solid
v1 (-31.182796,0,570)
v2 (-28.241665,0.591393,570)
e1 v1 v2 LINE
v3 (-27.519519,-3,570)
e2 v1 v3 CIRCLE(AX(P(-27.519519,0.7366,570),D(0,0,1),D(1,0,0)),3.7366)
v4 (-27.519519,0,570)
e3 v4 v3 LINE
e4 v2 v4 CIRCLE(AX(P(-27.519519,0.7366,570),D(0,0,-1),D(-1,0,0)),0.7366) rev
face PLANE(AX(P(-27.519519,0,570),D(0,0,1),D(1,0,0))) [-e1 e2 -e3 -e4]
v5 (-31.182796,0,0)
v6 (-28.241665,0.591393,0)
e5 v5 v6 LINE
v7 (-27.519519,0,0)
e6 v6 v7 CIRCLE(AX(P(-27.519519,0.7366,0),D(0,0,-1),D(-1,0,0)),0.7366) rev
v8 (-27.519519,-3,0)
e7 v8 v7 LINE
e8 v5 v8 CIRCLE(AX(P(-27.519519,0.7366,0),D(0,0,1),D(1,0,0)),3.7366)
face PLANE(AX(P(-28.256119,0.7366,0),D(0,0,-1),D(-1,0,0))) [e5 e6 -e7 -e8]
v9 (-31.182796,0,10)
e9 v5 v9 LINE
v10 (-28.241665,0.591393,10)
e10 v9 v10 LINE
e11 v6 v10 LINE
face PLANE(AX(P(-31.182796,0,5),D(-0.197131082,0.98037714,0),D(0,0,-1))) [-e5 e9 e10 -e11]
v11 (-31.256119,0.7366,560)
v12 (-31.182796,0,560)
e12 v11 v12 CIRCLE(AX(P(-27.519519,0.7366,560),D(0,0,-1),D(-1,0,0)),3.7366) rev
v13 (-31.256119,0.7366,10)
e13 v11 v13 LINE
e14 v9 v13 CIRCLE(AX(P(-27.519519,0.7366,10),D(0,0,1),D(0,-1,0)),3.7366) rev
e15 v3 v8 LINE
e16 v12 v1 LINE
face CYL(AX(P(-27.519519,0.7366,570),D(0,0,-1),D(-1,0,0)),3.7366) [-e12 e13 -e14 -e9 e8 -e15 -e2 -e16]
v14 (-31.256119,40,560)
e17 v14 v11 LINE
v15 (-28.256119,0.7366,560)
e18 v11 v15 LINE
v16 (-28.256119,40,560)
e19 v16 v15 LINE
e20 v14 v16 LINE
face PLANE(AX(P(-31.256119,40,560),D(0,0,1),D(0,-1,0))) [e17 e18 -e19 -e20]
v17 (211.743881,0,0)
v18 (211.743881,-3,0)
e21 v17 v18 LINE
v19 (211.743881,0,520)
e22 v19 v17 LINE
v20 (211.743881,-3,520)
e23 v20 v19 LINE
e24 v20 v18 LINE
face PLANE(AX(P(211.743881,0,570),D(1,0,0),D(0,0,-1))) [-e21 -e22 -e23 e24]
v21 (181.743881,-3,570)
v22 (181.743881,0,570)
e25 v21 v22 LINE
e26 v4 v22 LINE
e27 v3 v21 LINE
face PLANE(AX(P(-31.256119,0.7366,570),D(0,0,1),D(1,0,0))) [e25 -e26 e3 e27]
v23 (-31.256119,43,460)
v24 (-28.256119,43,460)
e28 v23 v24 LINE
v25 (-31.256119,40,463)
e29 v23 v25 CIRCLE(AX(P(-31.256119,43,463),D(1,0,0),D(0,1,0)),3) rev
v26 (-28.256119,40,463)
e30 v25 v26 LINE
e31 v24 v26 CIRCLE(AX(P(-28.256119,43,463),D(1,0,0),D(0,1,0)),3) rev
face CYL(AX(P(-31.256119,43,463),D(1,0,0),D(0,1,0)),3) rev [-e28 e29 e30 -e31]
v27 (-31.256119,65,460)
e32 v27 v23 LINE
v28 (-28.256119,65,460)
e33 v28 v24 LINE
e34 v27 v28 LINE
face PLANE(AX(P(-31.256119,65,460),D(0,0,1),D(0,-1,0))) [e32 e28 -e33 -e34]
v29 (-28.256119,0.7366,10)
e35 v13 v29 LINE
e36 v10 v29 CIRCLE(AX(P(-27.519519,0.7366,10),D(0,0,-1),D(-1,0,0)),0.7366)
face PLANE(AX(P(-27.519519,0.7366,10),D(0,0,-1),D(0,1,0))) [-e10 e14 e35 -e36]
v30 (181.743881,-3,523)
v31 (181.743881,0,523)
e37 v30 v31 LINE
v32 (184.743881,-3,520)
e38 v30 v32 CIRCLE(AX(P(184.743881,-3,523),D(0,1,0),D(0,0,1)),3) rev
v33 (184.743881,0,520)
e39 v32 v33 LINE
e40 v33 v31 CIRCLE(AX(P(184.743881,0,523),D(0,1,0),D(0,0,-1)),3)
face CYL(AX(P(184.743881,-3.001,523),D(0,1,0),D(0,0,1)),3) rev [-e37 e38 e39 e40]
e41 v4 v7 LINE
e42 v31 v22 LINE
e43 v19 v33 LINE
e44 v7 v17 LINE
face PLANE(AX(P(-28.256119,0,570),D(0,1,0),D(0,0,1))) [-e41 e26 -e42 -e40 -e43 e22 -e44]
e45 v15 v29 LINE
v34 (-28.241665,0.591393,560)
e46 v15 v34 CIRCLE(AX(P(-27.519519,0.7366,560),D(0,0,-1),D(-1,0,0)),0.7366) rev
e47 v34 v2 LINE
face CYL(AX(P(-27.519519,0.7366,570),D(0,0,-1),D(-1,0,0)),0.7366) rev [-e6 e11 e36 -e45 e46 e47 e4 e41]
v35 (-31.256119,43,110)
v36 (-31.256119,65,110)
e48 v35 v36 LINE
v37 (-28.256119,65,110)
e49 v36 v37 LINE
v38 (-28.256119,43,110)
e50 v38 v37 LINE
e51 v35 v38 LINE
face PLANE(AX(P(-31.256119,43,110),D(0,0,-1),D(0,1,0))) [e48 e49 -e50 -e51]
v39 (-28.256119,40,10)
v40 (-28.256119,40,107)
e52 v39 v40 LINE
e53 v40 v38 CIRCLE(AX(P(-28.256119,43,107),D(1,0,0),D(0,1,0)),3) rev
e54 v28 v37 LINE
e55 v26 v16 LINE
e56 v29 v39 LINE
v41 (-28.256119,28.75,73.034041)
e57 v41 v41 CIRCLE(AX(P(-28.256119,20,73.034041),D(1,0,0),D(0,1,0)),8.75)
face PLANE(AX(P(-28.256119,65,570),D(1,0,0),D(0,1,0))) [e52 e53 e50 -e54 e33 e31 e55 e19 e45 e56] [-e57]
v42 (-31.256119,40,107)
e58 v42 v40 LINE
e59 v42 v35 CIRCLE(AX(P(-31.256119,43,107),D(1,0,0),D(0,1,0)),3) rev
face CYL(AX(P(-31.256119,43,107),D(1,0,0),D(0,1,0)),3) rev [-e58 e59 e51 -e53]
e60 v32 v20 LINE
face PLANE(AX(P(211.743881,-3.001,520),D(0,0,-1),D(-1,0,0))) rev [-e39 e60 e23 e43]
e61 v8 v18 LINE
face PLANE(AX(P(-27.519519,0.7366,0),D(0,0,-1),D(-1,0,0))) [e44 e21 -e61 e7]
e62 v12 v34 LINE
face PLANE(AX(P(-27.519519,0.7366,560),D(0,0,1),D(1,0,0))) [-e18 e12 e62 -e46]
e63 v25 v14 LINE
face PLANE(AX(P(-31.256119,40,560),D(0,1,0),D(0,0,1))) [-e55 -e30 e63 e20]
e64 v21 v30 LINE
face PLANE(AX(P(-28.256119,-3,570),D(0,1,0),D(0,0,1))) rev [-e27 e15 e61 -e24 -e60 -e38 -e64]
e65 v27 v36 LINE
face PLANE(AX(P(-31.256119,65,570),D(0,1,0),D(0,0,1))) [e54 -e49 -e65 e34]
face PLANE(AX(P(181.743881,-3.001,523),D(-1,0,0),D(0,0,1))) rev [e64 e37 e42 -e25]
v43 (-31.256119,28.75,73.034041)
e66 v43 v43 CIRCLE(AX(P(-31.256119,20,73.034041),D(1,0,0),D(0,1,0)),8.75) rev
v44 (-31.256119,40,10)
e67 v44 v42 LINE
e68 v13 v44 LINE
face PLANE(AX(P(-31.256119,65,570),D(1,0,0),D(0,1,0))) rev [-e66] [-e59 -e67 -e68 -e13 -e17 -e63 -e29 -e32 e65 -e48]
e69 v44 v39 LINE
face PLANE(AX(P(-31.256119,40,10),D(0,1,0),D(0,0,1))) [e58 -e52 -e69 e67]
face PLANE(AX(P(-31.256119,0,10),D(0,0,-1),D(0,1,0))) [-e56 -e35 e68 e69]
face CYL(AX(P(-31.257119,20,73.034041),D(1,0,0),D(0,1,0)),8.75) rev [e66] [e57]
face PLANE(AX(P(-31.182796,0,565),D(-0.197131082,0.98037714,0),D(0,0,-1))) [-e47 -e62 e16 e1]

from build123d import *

# Parameters (mm, degrees)
BASE_FLANGE1_DEPTH       = 570
CUT_EXTRUDE1_OUTLINE_W   = 3
CUT_EXTRUDE1_OUTLINE_H   = 25
CUT_EXTRUDE1_DEPTH       = 107
CUT_EXTRUDE1_START       = 463
CUT_EXTRUDE1_2_OUTLINE_W = 3
CUT_EXTRUDE1_2_OUTLINE_H = 25
CUT_EXTRUDE1_2_DEPTH     = 107
CUT_EXTRUDE1_START_2     = -32
CUT_EXTRUDE1_3_DEPTH     = 5
CUT_EXTRUDE1_START_3     = -1
CUT_EXTRUDE1_4_DEPTH     = 11
CUT_EXTRUDE1_START_4     = 560
CUT_EXTRUDE1_5_DEPTH     = 11
CUT_EXTRUDE3_REACH       = 613.523
CUT_EXTRUDE4_REACH       = 623.872
SKETCH8_R                = 8.75


with BuildPart() as part:
    # Base-Flange1: sheet metal written as solids
    # Sketch1 → Base-Flange1 (new body)
    with BuildSketch(Plane.XY):
        with BuildLine():
            Line((-28.256118786, 65), (-28.256118786, 0.7366))
            ThreePointArc((-28.256118786, 0.7366), (-28.040373641, 0.215745145), (-27.519518786, 0))
            Line((-27.519518786, 0), (211.743881214, 0))
            Line((211.743881214, 0), (211.743881214, -3))
            Line((211.743881214, -3), (-27.519518786, -3))
            ThreePointArc((-27.519518786, -3), (-30.161693985, -1.905575199), (-31.256118786, 0.7366))
            Line((-31.256118786, 0.7366), (-31.256118786, 65))
            Line((-31.256118786, 65), (-28.256118786, 65))
        make_face()
    extrude(amount=BASE_FLANGE1_DEPTH)

    # Cut-Extrude1: read off the stored shape, not the designer's step
    # Cut-Extrude1 outline → Cut-Extrude1 (cut)
    with BuildSketch(Plane.XY):
        with Locations((-29.756118786, 52.5)):
            Rectangle(CUT_EXTRUDE1_OUTLINE_W, CUT_EXTRUDE1_OUTLINE_H)
    extrude(amount=CUT_EXTRUDE1_DEPTH, mode=Mode.SUBTRACT)

    # Cut-Extrude1 2 outline → Cut-Extrude1 2 (cut)
    with BuildSketch(Plane.XY.offset(CUT_EXTRUDE1_START)):
        with Locations((-29.756118786, 52.5)):
            Rectangle(CUT_EXTRUDE1_2_OUTLINE_W, CUT_EXTRUDE1_2_OUTLINE_H)
    extrude(amount=CUT_EXTRUDE1_2_DEPTH, mode=Mode.SUBTRACT)

    # Cut-Extrude1 3 outline → Cut-Extrude1 3 (cut)
    with BuildSketch(Plane.YZ.offset(CUT_EXTRUDE1_START_2)):
        with BuildLine():
            Line((65, 110), (43, 110))
            ThreePointArc((43, 110), (40.878679656, 109.121320344), (40, 107))
            Line((40, 107), (65, 107))
            Line((65, 107), (65, 110))
        make_face()
        with BuildLine():
            Line((43, 460), (65, 460))
            Line((65, 460), (65, 463))
            Line((65, 463), (40, 463))
            ThreePointArc((40, 463), (40.878679656, 460.878679656), (43, 460))
        make_face()
    extrude(amount=CUT_EXTRUDE1_3_DEPTH, mode=Mode.SUBTRACT)

    # Cut-Extrude1 4 outline → Cut-Extrude1 4 (cut)
    with BuildSketch(Plane.XY.offset(CUT_EXTRUDE1_START_3)):
        with BuildLine():
            Line((-31.182796008, 0), (-28.241664587, 0.591393245))
            ThreePointArc((-28.241664587, 0.591393245), (-28.252496329, 0.663637809), (-28.256118786, 0.7366))
            Line((-28.256118786, 0.7366), (-28.256118786, 40))
            Line((-28.256118786, 40), (-31.256118786, 40))
            Line((-31.256118786, 40), (-31.256118786, 0.7366))
            ThreePointArc((-31.256118786, 0.7366), (-31.237742907, 0.36647982), (-31.182796008, 0))
        make_face()
    extrude(amount=CUT_EXTRUDE1_4_DEPTH, mode=Mode.SUBTRACT)

    # Cut-Extrude1 5 outline → Cut-Extrude1 5 (cut)
    with BuildSketch(Plane.XY.offset(CUT_EXTRUDE1_START_4)):
        with BuildLine():
            Line((-31.182796008, 0), (-28.241664587, 0.591393245))
            ThreePointArc((-28.241664587, 0.591393245), (-28.252496329, 0.663637809), (-28.256118786, 0.7366))
            Line((-28.256118786, 0.7366), (-28.256118786, 40))
            Line((-28.256118786, 40), (-31.256118786, 40))
            Line((-31.256118786, 40), (-31.256118786, 0.7366))
            ThreePointArc((-31.256118786, 0.7366), (-31.237742907, 0.36647982), (-31.182796008, 0))
        make_face()
    extrude(amount=CUT_EXTRUDE1_5_DEPTH, mode=Mode.SUBTRACT)

    # Sketch7 → Cut-Extrude3 (cut, up to next)
    with BuildSketch(Plane(origin=(0, 0, 0), x_dir=(1, 0, 0), z_dir=(0, 1, 0)), mode=Mode.PRIVATE) as cut_extrude3_sk1:
        with BuildLine():
            Line((211.743881214, -520), (184.743881214, -520))
            ThreePointArc((184.743881214, -520), (182.62256087, -520.878679656), (181.743881214, -523))
            Line((181.743881214, -523), (181.743881214, -570))
            Line((181.743881214, -570), (211.743881214, -570))
            Line((211.743881214, -570), (211.743881214, -520))
        make_face()
    cut_extrude3_tool1 = extrude(cut_extrude3_sk1.sketch, amount=-CUT_EXTRUDE3_REACH, mode=Mode.PRIVATE) & part.part
    add(cut_extrude3_tool1.solids().sort_by_distance((196.762356, 0, 545.031368))[0], mode=Mode.SUBTRACT)

    # Sketch8 → Cut-Extrude4 (cut, up to next)
    with BuildSketch(Plane(origin=(-28.256118786, 0, 0), x_dir=(0, 0, -1), z_dir=(1, 0, 0)), mode=Mode.PRIVATE) as cut_extrude4_sk1:
        with Locations(Location((-73.034040989, 20, 0), (0, 0, 90))):
            Circle(SKETCH8_R)
    cut_extrude4_tool1 = extrude(cut_extrude4_sk1.sketch, amount=-CUT_EXTRUDE4_REACH, mode=Mode.PRIVATE) & part.part
    add(cut_extrude4_tool1.solids().sort_by_distance((-28.256119, 20, 73.034041))[0], mode=Mode.SUBTRACT)


solid = part.part
